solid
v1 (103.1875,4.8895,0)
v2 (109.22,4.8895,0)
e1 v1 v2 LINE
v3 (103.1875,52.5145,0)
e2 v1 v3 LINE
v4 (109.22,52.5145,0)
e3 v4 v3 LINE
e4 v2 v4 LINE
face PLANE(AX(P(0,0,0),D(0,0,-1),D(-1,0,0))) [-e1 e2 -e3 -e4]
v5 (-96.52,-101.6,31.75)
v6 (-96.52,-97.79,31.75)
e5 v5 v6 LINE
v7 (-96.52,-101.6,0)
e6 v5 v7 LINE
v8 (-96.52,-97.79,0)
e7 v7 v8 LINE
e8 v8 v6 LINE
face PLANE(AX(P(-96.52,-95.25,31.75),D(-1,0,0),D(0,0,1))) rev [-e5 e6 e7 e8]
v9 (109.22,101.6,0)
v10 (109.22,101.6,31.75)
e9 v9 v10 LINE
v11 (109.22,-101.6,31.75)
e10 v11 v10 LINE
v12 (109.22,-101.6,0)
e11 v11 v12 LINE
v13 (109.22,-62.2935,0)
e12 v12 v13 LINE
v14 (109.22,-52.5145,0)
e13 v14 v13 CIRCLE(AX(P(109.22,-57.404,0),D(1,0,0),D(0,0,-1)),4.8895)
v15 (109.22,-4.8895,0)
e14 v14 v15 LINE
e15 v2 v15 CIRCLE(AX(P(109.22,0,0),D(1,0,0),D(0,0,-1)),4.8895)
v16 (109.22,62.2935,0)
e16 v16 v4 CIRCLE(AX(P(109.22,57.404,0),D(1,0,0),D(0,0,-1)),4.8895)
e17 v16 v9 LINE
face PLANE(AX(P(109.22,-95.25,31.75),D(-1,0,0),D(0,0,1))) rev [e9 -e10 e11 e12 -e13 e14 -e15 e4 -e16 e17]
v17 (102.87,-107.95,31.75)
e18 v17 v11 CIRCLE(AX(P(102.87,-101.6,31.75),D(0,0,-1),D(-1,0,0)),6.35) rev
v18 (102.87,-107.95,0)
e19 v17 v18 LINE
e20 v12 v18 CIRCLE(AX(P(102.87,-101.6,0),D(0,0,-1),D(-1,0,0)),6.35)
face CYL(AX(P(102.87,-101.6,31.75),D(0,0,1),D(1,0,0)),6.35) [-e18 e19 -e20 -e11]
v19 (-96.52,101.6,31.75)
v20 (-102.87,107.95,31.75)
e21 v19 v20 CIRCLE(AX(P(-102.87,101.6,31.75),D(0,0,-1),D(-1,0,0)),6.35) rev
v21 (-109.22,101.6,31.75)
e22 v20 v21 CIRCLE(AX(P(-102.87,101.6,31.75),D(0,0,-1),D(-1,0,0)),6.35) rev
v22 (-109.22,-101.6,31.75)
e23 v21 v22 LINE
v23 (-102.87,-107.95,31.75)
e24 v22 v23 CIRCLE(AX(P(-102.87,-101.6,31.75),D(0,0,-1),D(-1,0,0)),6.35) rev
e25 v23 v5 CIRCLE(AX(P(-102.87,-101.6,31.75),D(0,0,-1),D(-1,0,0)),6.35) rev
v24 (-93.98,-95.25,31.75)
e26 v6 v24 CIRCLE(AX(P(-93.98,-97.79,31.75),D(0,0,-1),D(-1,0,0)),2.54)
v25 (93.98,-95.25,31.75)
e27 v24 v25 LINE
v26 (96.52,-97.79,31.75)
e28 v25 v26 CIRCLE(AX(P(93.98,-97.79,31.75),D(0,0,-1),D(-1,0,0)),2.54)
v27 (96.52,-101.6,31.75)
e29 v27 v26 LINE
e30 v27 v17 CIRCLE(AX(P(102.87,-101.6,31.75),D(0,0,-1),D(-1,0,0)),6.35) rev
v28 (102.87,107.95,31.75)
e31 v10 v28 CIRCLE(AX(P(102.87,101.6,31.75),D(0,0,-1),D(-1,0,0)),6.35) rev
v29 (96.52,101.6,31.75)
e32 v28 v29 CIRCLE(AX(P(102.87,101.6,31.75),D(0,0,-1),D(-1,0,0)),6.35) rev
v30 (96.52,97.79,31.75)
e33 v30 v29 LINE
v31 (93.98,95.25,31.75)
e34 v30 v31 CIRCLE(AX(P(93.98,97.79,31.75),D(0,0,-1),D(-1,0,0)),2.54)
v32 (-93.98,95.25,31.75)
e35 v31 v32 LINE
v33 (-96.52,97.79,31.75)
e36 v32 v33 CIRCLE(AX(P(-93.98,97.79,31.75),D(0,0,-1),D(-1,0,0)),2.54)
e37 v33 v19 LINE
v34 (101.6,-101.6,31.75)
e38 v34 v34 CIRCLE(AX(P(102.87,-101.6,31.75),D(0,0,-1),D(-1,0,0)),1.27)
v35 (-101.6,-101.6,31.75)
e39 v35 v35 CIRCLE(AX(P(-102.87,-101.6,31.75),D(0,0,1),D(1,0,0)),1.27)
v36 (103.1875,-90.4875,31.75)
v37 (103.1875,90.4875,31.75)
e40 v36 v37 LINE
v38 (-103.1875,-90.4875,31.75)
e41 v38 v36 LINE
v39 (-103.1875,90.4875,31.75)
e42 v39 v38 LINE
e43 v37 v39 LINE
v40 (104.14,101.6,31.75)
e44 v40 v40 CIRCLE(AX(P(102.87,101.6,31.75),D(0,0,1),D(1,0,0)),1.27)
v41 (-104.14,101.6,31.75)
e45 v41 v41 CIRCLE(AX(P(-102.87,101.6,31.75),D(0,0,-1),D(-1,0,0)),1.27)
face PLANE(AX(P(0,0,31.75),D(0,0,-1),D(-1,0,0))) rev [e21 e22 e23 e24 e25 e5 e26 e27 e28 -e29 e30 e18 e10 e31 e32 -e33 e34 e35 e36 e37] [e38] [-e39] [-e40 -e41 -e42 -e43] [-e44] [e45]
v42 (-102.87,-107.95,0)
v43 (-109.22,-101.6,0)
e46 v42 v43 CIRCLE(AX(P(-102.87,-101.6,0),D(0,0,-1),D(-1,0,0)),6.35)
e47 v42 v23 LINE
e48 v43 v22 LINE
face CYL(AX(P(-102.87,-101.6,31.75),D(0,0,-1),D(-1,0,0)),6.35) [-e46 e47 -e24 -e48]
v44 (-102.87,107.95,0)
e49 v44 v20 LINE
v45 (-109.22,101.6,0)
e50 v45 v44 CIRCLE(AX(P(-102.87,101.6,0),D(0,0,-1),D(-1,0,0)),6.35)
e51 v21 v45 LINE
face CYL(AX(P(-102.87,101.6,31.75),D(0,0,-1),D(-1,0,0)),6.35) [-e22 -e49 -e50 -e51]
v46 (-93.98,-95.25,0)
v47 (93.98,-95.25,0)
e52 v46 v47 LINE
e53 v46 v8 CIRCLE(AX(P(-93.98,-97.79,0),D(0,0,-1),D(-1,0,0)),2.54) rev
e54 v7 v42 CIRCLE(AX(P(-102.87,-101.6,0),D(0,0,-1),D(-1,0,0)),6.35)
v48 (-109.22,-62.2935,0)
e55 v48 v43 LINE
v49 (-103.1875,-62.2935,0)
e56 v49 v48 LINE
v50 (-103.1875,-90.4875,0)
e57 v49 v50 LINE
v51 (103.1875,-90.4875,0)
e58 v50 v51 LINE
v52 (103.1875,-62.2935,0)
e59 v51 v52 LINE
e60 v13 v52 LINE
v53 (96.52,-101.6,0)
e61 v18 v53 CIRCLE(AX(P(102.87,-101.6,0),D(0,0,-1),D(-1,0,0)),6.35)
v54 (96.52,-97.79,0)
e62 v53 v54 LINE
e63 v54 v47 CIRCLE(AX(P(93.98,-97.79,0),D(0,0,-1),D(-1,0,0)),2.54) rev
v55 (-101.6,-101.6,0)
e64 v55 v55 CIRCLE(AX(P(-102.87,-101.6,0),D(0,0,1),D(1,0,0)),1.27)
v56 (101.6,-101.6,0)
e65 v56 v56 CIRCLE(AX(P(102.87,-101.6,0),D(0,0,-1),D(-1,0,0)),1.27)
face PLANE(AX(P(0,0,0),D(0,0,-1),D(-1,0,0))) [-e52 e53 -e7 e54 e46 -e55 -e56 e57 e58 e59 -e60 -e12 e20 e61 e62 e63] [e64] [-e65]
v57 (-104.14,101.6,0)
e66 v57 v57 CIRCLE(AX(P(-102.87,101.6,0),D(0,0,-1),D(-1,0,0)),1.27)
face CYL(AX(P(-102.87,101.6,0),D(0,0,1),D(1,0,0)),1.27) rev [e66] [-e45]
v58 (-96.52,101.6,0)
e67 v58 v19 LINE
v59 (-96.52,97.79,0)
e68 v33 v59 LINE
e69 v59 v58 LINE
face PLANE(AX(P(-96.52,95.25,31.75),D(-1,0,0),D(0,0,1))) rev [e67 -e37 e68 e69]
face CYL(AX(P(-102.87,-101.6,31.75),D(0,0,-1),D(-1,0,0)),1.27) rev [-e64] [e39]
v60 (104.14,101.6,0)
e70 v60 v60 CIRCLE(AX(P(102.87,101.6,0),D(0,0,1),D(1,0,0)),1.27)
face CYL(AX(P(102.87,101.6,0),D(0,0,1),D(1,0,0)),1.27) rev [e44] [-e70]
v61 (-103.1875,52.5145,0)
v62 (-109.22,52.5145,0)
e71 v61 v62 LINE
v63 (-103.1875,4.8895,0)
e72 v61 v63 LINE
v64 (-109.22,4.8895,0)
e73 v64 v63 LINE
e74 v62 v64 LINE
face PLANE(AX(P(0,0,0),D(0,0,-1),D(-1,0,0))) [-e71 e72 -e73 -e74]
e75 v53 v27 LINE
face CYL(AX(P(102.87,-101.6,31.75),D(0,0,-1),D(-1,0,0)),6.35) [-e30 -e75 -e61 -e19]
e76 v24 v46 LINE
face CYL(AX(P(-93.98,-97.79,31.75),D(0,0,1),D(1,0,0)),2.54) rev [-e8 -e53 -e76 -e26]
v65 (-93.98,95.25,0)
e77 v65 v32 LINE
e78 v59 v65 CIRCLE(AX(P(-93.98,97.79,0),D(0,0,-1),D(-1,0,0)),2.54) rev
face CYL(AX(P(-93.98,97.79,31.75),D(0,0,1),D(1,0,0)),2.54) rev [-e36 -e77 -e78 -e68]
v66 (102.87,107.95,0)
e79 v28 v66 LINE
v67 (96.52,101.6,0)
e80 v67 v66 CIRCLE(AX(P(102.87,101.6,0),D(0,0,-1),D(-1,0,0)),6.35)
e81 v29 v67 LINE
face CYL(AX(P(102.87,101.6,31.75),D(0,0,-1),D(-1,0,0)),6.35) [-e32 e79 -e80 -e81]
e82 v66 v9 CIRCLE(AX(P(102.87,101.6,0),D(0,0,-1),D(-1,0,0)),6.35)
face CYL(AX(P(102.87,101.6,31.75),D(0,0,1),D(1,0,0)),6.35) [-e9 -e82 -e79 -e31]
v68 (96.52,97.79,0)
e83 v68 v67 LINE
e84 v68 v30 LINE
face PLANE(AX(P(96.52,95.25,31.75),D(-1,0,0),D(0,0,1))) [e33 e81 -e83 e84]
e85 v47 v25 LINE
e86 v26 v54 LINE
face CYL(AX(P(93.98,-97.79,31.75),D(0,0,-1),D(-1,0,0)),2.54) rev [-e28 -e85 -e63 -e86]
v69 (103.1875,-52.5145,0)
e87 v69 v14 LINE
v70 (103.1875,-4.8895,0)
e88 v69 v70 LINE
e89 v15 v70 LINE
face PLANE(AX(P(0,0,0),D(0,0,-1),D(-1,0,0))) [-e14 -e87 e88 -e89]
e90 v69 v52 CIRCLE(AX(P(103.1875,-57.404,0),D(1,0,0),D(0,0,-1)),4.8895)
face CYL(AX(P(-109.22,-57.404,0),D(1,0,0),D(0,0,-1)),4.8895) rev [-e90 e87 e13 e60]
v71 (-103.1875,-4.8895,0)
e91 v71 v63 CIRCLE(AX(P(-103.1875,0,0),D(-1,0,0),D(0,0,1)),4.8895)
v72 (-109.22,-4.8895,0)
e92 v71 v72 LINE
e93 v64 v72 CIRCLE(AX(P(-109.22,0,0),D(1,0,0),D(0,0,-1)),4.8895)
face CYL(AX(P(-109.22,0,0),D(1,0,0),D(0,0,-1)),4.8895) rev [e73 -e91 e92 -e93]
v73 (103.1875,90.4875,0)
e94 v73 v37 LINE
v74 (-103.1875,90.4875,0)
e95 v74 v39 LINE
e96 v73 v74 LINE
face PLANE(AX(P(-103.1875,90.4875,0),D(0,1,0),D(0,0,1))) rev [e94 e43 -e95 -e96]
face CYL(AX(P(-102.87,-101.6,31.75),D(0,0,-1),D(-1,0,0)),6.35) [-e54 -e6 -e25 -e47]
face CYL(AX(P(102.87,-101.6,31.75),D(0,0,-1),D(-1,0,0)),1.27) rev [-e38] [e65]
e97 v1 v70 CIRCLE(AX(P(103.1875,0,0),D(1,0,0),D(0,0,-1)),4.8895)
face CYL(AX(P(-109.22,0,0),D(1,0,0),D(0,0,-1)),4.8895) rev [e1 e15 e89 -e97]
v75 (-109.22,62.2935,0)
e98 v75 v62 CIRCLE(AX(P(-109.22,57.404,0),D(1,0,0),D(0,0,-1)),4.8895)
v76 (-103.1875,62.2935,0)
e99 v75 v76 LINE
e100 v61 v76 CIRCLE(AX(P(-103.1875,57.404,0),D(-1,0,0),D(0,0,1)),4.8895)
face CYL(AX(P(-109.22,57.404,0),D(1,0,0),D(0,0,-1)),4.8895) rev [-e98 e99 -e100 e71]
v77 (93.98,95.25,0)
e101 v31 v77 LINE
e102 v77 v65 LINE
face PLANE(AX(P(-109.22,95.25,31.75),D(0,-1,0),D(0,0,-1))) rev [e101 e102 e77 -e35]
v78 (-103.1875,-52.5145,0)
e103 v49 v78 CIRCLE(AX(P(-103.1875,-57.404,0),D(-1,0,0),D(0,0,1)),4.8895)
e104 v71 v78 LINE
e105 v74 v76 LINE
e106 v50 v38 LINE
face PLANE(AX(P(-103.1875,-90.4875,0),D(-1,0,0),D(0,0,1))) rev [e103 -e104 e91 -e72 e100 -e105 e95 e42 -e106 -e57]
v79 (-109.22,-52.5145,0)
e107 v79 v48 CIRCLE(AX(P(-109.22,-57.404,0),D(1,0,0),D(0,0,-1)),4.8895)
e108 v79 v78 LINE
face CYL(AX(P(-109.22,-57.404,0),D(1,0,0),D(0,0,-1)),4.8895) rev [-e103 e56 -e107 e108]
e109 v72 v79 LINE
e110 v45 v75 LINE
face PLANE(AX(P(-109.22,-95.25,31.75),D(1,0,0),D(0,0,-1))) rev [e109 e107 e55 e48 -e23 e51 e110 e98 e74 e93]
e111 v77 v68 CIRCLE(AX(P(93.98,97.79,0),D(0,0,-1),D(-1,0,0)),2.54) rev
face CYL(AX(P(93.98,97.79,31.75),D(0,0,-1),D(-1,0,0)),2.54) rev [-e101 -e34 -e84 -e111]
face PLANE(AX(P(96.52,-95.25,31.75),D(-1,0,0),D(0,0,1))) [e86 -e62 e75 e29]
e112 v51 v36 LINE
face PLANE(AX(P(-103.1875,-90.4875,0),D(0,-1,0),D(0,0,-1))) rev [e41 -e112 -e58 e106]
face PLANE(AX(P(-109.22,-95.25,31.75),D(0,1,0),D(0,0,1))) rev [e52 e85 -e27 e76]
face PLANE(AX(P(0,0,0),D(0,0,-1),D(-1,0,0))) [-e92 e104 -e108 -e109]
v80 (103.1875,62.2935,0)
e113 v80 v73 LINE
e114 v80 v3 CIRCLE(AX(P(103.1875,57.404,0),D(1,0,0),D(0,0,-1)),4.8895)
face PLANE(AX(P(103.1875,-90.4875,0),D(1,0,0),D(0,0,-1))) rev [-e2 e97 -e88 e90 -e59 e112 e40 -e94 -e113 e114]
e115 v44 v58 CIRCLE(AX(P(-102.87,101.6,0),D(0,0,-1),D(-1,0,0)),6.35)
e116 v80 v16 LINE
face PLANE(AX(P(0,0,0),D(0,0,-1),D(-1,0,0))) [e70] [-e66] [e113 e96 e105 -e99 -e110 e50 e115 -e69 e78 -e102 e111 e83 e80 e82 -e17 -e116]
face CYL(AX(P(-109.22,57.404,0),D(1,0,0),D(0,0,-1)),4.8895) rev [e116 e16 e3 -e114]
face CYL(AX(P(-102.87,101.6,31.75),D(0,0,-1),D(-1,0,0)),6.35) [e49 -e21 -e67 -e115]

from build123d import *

# Parameters (mm, degrees)
SKETCH1_W            = 218.44
SKETCH1_H            = 190.5
BOSS_EXTRUDE1_DEPTH  = 31.75
SKETCH2_W            = 206.375
SKETCH2_H            = 180.975
CUT_EXTRUDE1_DEPTH   = 149.356440373
SKETCH3_R            = 4.8895
CUT_EXTRUDE2_DEPTH   = 241.409356307
SKETCH4_W            = 12.7
SKETCH4_H            = 12.7
BOSS_EXTRUDE2_DEPTH  = 31.75
SKETCH5_R            = 1.27
CUT_EXTRUDE3_DEPTH   = 157.81286108
FILLET1_R            = 6.35
SKETCH6_W            = 12.7
SKETCH6_H            = 12.7
SKETCH6_R            = 1.27
BOSS_EXTRUDE3_DEPTH  = 31.75
FILLET4_R            = 6.35
FILLET1_OF_MIRROR8_R = 6.35
FILLET4_OF_MIRROR8_R = 6.35
FILLET5_R            = 2.54


with BuildPart() as part:
    # Sketch1 → Boss-Extrude1 (new body)
    with BuildSketch(Plane.XY):
        Rectangle(SKETCH1_W, SKETCH1_H)
    extrude(amount=BOSS_EXTRUDE1_DEPTH)

    # Sketch2 → Cut-Extrude1 (cut, through all)
    with BuildSketch(Plane.XY.offset(31.75)):
        Rectangle(SKETCH2_W, SKETCH2_H)
    extrude(amount=-CUT_EXTRUDE1_DEPTH, mode=Mode.SUBTRACT)

    # Sketch3 → Cut-Extrude2 (cut, through all)
    with BuildSketch(Plane(origin=(109.22, 0, 0), x_dir=(0, 0, -1), z_dir=(1, 0, 0))):
        Circle(SKETCH3_R)
        with Locations((0, 57.404)):
            Circle(SKETCH3_R)
        with Locations((0, -57.404)):
            Circle(SKETCH3_R)
    extrude(amount=-CUT_EXTRUDE2_DEPTH, mode=Mode.SUBTRACT)

    # Sketch4 → Boss-Extrude2 (add, through all)
    with BuildSketch(Plane(origin=(0, 0, 0), x_dir=(-1, 0, 0), z_dir=(0, 0, -1))):
        with Locations((-102.87, 101.6)):
            Rectangle(SKETCH4_W, SKETCH4_H)
    boss_extrude2 = extrude(amount=-BOSS_EXTRUDE2_DEPTH)

    # Sketch5 → Cut-Extrude3 (cut, through all)
    with BuildSketch(Plane.XY.offset(31.75)):
        with Locations((102.87, 101.6)):
            Circle(SKETCH5_R)
    cut_extrude3 = extrude(amount=-CUT_EXTRUDE3_DEPTH, mode=Mode.SUBTRACT)

    # Fillet1
    fillet1_edges = [part.edges().sort_by_distance(p)[0] for p in [
        (96.52, 107.95, 15.875),
        (109.22, 107.95, 15.875),
    ]]
    fillet(fillet1_edges, radius=FILLET1_R - 0.0001)  # a hair under: the kernel refuses the full size

    # Sketch6 → Boss-Extrude3 (add, through all)
    with BuildSketch(Plane(origin=(0, 0, 0), x_dir=(-1, 0, 0), z_dir=(0, 0, -1))):
        with Locations((-102.87, -101.6)):
            Rectangle(SKETCH6_W, SKETCH6_H)
        with Locations((-102.87, -101.6)):
            Circle(SKETCH6_R, mode=Mode.SUBTRACT)
    boss_extrude3 = extrude(amount=-BOSS_EXTRUDE3_DEPTH)

    # Fillet4
    fillet4_edges = [part.edges().sort_by_distance(p)[0] for p in [
        (109.22, -107.95, 15.875),
        (96.52, -107.95, 15.875),
    ]]
    fillet(fillet4_edges, radius=FILLET4_R - 0.0001)  # a hair under: the kernel refuses the full size

    # Mirror8: Boss-Extrude2, Cut-Extrude3, Boss-Extrude3 across plane
    add(boss_extrude2.mirror(Plane(origin=(0, 0, 0), x_dir=(0, 0, 1), z_dir=(1, 0, 0))))
    add(cut_extrude3.mirror(Plane(origin=(0, 0, 0), x_dir=(0, 0, 1), z_dir=(1, 0, 0))), mode=Mode.SUBTRACT)
    add(boss_extrude3.mirror(Plane(origin=(0, 0, 0), x_dir=(0, 0, 1), z_dir=(1, 0, 0))))

    # Fillet1 of Mirror8
    fillet1_of_mirror8_edges = [part.edges().sort_by_distance(p)[0] for p in [
        (-96.52, 107.95, 15.875),
        (-109.22, 107.95, 15.875),
    ]]
    fillet(fillet1_of_mirror8_edges, radius=FILLET1_OF_MIRROR8_R - 0.0001)  # a hair under: the kernel refuses the full size

    # Fillet4 of Mirror8
    fillet4_of_mirror8_edges = [part.edges().sort_by_distance(p)[0] for p in [
        (-109.22, -107.95, 15.875),
        (-96.52, -107.95, 15.875),
    ]]
    fillet(fillet4_of_mirror8_edges, radius=FILLET4_OF_MIRROR8_R - 0.0001)  # a hair under: the kernel refuses the full size

    # Fillet5
    fillet5_edges = [part.edges().sort_by_distance(p)[0] for p in [
        (96.52, -95.25, 15.875),
        (-96.52, 95.25, 15.875),
        (-96.52, -95.25, 15.875),
        (96.52, 95.25, 15.875),
    ]]
    fillet(fillet5_edges, radius=FILLET5_R)


solid = part.part
